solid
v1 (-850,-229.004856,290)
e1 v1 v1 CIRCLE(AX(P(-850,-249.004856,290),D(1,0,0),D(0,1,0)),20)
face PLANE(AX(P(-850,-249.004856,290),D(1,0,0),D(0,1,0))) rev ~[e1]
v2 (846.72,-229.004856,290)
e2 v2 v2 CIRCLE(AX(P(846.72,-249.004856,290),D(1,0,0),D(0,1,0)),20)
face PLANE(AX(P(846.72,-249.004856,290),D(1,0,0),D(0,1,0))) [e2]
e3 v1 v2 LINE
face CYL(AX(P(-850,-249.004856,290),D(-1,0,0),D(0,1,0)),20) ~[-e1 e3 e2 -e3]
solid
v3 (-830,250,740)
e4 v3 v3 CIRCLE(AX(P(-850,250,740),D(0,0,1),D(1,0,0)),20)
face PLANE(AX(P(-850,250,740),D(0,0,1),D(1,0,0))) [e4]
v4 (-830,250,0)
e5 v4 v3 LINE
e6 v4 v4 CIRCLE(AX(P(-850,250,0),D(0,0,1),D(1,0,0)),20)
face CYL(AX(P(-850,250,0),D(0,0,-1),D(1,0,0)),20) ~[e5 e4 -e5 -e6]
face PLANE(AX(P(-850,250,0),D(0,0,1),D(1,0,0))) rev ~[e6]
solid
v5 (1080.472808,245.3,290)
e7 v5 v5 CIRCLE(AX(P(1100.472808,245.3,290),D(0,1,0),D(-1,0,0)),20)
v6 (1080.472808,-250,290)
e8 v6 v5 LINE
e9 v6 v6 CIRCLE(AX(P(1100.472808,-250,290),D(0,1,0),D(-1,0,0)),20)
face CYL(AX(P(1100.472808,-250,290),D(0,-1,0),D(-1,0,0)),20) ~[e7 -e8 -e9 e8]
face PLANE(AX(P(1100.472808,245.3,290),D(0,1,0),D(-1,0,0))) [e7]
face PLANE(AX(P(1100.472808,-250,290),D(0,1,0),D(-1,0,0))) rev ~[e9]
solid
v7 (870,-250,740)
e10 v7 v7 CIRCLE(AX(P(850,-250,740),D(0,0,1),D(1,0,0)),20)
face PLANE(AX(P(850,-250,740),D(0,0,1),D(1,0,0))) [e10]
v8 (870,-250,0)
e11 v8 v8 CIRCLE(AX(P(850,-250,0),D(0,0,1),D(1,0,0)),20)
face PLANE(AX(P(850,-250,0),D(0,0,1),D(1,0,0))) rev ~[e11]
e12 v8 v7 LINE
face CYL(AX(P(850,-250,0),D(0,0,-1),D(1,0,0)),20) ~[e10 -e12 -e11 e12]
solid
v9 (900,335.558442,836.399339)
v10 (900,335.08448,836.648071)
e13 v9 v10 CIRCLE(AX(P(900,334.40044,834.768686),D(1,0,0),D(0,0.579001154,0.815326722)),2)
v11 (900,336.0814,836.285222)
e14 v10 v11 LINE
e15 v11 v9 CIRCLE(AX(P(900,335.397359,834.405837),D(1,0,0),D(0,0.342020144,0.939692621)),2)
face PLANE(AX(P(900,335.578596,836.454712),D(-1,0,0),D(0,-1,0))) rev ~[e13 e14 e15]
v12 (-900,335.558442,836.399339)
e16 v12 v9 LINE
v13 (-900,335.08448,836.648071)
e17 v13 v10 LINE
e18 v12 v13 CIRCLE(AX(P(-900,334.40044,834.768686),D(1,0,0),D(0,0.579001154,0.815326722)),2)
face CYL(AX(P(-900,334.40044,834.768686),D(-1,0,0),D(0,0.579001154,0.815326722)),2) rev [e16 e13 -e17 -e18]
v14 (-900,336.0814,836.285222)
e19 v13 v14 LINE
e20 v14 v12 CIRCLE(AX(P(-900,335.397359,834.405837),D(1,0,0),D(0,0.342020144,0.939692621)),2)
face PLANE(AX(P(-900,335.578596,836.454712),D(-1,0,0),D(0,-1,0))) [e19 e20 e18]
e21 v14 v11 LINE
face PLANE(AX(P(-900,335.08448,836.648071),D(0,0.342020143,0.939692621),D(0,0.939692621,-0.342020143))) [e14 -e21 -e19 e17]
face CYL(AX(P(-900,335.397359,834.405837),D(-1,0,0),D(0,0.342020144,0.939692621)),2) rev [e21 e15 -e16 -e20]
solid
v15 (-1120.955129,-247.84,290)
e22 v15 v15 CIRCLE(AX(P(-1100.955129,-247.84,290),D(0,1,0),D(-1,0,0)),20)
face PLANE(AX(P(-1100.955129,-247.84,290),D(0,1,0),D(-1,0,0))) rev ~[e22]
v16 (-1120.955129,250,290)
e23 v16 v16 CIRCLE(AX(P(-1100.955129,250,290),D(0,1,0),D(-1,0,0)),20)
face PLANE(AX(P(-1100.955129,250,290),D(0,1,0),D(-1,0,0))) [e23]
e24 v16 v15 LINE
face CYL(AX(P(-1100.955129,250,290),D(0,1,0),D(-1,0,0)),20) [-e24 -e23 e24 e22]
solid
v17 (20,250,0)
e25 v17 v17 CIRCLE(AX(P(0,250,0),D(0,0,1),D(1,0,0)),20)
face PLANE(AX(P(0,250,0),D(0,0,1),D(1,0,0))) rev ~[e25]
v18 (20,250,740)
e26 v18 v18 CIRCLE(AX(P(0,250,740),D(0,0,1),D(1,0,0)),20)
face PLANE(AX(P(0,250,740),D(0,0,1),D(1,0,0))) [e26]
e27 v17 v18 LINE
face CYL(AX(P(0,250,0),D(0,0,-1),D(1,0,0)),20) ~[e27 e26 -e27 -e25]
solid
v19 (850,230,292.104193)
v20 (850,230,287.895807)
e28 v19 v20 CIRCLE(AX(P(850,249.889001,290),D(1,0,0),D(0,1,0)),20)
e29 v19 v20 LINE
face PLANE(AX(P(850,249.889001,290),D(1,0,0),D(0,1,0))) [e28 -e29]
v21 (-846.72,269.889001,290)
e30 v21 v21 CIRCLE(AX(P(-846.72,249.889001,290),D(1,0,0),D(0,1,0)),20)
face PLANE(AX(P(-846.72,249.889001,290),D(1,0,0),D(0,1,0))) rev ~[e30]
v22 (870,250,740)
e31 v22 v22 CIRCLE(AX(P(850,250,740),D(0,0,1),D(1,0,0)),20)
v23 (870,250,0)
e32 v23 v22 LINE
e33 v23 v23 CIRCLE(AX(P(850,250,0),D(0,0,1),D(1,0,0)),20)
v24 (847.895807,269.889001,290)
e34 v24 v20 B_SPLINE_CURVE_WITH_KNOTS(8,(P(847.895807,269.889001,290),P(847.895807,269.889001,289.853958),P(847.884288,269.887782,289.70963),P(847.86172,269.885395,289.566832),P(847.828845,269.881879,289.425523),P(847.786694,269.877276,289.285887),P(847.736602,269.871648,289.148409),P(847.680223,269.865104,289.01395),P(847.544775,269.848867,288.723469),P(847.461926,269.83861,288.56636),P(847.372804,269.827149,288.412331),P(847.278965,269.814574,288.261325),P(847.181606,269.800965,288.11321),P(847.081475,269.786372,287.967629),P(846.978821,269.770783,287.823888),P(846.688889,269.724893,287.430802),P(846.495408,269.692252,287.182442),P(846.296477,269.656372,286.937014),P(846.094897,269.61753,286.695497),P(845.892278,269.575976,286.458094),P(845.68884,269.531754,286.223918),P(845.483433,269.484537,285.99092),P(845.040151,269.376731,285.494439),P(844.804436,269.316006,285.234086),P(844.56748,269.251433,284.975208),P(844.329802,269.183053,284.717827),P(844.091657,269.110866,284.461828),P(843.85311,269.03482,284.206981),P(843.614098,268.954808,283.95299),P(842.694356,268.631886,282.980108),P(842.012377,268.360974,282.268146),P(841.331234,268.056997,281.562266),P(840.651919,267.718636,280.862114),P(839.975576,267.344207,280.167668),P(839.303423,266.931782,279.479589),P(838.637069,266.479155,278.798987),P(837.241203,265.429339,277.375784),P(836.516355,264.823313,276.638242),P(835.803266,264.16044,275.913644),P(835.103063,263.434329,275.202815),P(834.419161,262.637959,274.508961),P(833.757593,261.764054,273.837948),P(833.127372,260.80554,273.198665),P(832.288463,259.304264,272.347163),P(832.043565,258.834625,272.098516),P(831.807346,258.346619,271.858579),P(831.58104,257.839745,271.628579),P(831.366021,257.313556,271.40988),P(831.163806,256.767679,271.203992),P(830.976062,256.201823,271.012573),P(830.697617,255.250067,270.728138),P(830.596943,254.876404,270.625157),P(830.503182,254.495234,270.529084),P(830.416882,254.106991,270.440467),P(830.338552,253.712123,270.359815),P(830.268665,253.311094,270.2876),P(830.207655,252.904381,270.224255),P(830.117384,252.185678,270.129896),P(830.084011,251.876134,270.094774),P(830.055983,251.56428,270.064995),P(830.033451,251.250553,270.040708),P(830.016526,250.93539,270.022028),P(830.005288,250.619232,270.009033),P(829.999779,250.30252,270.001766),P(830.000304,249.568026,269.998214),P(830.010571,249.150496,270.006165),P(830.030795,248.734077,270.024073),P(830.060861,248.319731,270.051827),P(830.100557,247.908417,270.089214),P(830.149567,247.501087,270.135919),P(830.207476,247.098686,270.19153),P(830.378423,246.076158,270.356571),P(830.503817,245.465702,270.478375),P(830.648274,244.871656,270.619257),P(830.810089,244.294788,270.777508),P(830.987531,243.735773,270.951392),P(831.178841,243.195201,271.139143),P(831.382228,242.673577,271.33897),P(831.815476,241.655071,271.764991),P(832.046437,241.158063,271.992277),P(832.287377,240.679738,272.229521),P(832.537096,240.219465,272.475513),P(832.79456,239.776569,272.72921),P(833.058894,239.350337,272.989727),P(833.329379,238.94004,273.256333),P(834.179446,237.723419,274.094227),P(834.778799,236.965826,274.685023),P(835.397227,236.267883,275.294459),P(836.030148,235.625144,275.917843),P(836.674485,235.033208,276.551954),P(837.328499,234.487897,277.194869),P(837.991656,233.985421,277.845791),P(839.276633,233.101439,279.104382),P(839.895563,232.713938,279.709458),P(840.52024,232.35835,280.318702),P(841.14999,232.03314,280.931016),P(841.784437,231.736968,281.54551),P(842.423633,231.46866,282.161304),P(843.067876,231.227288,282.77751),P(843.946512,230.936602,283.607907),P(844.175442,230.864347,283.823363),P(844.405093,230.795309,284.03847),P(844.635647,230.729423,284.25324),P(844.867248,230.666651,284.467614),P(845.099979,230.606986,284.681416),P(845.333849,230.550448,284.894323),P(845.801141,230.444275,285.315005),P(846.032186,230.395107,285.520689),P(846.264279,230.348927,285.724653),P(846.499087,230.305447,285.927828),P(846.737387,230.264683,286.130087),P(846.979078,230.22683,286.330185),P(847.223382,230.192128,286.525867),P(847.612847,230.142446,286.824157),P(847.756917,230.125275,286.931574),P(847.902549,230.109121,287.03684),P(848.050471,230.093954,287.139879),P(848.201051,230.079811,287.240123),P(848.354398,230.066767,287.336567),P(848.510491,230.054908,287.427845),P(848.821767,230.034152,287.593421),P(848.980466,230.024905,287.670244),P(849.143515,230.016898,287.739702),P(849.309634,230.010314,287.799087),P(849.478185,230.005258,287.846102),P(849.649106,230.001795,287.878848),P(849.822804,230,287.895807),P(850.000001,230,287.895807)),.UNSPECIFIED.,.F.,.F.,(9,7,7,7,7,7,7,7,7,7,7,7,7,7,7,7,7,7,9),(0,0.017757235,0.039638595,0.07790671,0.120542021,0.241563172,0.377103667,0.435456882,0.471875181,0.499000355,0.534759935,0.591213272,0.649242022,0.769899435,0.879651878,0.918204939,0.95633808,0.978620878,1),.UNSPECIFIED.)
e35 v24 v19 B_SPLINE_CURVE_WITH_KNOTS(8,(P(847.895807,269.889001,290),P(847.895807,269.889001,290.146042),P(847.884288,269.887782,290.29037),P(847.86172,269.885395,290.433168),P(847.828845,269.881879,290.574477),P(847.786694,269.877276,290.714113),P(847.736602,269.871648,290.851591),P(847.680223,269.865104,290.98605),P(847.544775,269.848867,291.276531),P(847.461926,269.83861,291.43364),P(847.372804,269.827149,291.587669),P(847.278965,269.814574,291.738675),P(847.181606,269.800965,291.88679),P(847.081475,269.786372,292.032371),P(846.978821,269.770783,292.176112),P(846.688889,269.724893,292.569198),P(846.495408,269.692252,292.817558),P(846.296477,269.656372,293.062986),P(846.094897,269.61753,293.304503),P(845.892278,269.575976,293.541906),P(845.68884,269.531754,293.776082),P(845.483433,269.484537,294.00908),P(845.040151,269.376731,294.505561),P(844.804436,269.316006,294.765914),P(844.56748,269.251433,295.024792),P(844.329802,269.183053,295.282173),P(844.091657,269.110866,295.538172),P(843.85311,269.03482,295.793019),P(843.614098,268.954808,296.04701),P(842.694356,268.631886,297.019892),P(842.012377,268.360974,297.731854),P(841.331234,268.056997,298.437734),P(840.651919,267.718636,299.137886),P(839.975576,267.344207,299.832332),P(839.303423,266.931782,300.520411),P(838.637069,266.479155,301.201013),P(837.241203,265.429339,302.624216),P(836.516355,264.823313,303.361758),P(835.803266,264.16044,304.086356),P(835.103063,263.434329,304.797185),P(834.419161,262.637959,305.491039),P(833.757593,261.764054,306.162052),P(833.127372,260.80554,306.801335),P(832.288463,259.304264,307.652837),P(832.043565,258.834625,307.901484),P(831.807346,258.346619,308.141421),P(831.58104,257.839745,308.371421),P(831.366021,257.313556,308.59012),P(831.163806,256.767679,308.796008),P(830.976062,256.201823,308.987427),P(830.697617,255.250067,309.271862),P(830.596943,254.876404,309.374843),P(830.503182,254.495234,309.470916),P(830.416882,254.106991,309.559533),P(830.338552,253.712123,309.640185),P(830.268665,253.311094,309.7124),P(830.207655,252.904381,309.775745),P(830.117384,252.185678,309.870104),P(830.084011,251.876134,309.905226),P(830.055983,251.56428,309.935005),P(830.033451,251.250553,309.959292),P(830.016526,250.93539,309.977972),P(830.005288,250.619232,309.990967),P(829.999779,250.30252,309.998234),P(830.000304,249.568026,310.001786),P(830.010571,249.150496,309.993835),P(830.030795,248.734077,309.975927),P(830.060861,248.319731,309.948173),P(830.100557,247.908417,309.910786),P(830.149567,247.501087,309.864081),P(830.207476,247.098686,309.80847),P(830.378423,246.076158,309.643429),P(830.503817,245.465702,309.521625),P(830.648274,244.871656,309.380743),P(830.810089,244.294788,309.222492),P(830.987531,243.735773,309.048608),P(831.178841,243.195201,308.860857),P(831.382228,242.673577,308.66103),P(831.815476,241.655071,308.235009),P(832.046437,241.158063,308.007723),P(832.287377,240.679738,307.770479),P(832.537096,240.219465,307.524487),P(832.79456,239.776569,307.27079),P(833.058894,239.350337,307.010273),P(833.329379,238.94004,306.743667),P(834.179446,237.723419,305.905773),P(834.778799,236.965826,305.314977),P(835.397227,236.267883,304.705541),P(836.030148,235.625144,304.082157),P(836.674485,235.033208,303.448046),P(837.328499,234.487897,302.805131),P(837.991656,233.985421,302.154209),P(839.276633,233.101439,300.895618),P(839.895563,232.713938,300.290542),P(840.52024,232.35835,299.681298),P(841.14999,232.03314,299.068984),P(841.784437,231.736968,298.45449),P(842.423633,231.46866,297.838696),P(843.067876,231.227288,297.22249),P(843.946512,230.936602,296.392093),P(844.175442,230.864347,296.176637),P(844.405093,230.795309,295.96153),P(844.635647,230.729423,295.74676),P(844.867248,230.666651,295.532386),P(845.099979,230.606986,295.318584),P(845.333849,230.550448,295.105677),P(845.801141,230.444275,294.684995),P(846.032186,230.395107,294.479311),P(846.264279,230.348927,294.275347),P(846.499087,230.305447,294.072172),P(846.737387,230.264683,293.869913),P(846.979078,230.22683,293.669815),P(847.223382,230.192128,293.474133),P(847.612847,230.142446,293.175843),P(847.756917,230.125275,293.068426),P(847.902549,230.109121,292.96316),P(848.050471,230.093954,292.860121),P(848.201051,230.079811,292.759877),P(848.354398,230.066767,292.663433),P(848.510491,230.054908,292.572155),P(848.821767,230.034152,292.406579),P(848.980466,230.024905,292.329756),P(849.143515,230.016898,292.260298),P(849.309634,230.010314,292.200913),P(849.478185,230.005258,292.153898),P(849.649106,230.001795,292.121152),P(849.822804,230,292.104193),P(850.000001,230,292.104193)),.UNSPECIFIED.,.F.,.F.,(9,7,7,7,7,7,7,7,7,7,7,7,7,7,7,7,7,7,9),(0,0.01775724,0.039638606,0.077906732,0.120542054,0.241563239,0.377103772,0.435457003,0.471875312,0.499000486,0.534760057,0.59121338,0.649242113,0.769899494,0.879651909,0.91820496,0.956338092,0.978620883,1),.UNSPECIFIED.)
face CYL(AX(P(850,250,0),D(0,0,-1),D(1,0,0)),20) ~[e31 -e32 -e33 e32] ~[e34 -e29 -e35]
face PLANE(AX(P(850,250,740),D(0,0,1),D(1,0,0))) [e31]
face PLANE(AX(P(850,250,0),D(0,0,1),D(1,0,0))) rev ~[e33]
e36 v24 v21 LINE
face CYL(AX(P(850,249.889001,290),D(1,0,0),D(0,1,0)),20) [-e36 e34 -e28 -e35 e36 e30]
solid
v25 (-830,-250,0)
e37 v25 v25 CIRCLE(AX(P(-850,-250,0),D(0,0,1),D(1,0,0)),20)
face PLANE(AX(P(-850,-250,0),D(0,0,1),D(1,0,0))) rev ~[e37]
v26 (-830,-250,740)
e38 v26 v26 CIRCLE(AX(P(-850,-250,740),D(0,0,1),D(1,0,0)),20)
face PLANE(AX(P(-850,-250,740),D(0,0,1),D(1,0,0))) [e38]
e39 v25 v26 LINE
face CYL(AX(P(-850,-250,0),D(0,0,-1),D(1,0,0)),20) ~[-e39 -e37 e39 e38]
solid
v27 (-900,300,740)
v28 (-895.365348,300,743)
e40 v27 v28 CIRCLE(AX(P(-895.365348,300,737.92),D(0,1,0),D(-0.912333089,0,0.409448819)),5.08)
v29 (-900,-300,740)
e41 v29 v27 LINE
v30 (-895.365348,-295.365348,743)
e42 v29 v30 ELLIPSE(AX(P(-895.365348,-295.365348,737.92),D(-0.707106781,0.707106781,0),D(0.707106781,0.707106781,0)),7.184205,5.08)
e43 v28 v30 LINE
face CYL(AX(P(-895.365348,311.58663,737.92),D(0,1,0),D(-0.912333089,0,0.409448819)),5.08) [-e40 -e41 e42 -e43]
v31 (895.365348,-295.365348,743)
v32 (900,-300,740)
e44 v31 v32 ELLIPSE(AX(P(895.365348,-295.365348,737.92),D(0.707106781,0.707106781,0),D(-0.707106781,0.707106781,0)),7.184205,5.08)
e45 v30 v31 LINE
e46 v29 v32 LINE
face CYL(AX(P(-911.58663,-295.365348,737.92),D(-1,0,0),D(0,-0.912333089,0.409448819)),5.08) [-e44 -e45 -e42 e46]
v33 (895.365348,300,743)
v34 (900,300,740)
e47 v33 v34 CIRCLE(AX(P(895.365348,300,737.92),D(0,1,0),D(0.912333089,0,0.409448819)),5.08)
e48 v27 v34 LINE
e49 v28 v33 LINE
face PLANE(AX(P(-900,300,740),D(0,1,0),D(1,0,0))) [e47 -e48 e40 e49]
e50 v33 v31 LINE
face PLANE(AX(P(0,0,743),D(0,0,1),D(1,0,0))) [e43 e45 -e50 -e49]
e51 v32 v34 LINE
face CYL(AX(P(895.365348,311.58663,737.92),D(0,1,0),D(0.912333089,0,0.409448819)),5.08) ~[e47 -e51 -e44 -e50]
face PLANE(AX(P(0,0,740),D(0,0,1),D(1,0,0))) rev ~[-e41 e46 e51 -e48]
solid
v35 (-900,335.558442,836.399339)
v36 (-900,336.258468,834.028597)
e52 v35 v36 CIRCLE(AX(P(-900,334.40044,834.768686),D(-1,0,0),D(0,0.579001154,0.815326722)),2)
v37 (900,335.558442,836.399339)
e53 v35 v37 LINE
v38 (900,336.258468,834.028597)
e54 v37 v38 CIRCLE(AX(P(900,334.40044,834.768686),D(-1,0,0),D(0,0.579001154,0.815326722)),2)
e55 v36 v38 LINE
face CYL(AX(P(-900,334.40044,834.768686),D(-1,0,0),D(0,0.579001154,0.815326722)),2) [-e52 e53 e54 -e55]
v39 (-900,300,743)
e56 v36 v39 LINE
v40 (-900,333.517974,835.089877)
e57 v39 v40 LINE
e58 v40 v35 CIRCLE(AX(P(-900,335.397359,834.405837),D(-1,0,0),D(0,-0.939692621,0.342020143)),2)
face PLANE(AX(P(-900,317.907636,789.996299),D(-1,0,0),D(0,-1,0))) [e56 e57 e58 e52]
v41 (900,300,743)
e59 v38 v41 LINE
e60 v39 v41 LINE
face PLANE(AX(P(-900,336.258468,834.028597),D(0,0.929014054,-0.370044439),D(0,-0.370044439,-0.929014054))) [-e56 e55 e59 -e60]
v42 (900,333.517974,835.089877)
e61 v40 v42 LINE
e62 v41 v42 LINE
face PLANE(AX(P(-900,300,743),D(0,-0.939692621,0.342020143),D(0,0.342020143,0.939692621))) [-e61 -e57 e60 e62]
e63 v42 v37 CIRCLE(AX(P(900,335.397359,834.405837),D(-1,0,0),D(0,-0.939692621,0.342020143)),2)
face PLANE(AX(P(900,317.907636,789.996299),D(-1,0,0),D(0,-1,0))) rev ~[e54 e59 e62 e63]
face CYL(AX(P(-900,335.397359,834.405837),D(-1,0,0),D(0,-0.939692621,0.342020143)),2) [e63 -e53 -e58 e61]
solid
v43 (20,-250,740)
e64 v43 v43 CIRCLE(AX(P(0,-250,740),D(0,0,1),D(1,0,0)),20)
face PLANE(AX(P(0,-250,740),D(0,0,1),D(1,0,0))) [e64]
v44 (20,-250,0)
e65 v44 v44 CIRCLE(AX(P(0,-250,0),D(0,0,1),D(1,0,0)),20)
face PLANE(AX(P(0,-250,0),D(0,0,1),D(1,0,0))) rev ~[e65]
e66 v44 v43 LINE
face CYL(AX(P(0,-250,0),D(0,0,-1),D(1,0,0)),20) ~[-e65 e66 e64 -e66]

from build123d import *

# Parameters (mm, degrees)
F0_R        = 20
F1_DEPTH    = 740
F2_W        = 1800
F2_H        = 600
F3_DEPTH    = 3
F5_DEPTH    = 1800
F6_T1_DEPTH = 623.1732604525
F6_T3_DEPTH = 1823.1732604525
F8_R        = 20
F9_DEPTH    = 1696.72
F11_R       = 20
F12_DEPTH   = 495.3
F14_R       = 20
F15_DEPTH   = 1696.72
F17_R       = 20
F18_DEPTH   = 497.84


# Not quite as in the source:
# - a fillet or chamfer that OpenCascade refuses, or shapes differently, is made with other operations: its cross-section is extruded or revolved along the edge and cut away or added


with BuildPart() as f1:
    # F0 (on Top) → F1 (new body)
    with BuildSketch(Plane.XY):
        with Locations((-850, 250)):
            Circle(F0_R)
    extrude(amount=F1_DEPTH)


with BuildPart() as f1b:
    # F0 (on Top) → F1, piece 2 (new body)
    with BuildSketch(Plane.XY):
        with Locations((-850, -250)):
            Circle(F0_R)
    extrude(amount=F1_DEPTH)


with BuildPart() as f1c:
    # F0 (on Top) → F1, piece 3 (new body)
    with BuildSketch(Plane.XY):
        with Locations((850, 250)):
            Circle(F0_R)
    extrude(amount=F1_DEPTH)

    # F14 (on face) → F15 (join)
    with BuildSketch(Plane.YZ.offset(850)):
        with Locations((249.8890012503, 290)):
            Circle(F14_R)
    extrude(amount=-F15_DEPTH)


with BuildPart() as f1d:
    # F0 (on Top) → F1, piece 4 (new body)
    with BuildSketch(Plane.XY):
        with Locations((850, -250)):
            Circle(F0_R)
    extrude(amount=F1_DEPTH)


with BuildPart() as f1e:
    # F0 (on Top) → F1, piece 5 (new body)
    with BuildSketch(Plane.XY):
        with Locations((0, 250)):
            Circle(F0_R)
    extrude(amount=F1_DEPTH)


with BuildPart() as f1f:
    # F0 (on Top) → F1, piece 6 (new body)
    with BuildSketch(Plane.XY):
        with Locations((0, -250)):
            Circle(F0_R)
    extrude(amount=F1_DEPTH)


with BuildPart() as f3:
    # F2 (on face) → F3 (new body)
    with BuildSketch(Plane.XY.offset(740)):
        Rectangle(F2_W, F2_H)
    extrude(amount=F3_DEPTH)

    # F6: fillet of radius 5.08 on 3 edges, made by hand

    # F6_s2 → F6_t1 (cut)
    with BuildSketch(Plane.XZ.offset(-311.5866302263)):
        with BuildLine():
            ThreePointArc((900, 740), (898.1257826579, 742.1845515591), (895.3653479095, 743))
            Line((895.3653479095, 743), (900, 743))
            Line((900, 743), (900, 740))
        make_face()
        with BuildLine():
            ThreePointArc((-900, 740), (-898.1257826579, 742.1845515591), (-895.3653479095, 743))
            Line((-895.3653479095, 743), (-900, 743))
            Line((-900, 743), (-900, 740))
        make_face()
    extrude(amount=F6_T1_DEPTH, mode=Mode.SUBTRACT)

    # F6_s4 → F6_t3 (cut)
    with BuildSketch(Plane.YZ.offset(-911.5866302263)):
        with BuildLine():
            ThreePointArc((-300, 740), (-298.1257826579, 742.1845515591), (-295.3653479095, 743))
            Line((-295.3653479095, 743), (-300, 743))
            Line((-300, 743), (-300, 740))
        make_face()
    extrude(amount=F6_T3_DEPTH, mode=Mode.SUBTRACT)


with BuildPart() as f5:
    # F4 (on face) → F5 (new body, through all)
    with BuildSketch(Plane(origin=(-900, 0, 0), x_dir=(0, -1, 0), z_dir=(-1, 0, 0))):
        with BuildLine():
            Line((-336.2584676847, 834.0285967724), (-300, 743))
            Line((-300, 743), (-333.5179740459, 835.089876837))
            ThreePointArc((-333.5179740459, 835.089876837), (-334.3171677089, 836.089043654), (-335.5584418841, 836.3993390954))
            ThreePointArc((-335.5584418841, 836.3993390954), (-336.3185674809, 835.3350648013), (-336.2584676847, 834.0285967724))
        make_face()
    extrude(amount=-F5_DEPTH)


with BuildPart() as f5b:
    # F4 (on face) → F5, piece 2 (new body, through all)
    with BuildSketch(Plane(origin=(-900, 0, 0), x_dir=(0, -1, 0), z_dir=(-1, 0, 0))):
        with BuildLine():
            ThreePointArc((-336.0813995741, 836.2852217919), (-335.8237556544, 836.3598544977), (-335.5584418841, 836.3993390954))
            ThreePointArc((-335.5584418841, 836.3993390954), (-335.3298195345, 836.5396325429), (-335.0844798629, 836.6480708928))
            Line((-335.0844798629, 836.6480708928), (-336.0813995741, 836.2852217919))
        make_face()
    extrude(amount=-F5_DEPTH)


with BuildPart() as f9:
    # F8 (on face) → F9 (new body)
    with BuildSketch(Plane.YZ.offset(-850)):
        with Locations((-249.004855752, 290)):
            Circle(F8_R)
    extrude(amount=F9_DEPTH)


with BuildPart() as f12:
    # F11 (on face) → F12 (new body)
    with BuildSketch(Plane(origin=(0, -250, 0), x_dir=(-1, 0, 0), z_dir=(0, 1, 0))):
        with Locations((-1100.4728078842, 290)):
            Circle(F11_R)
    extrude(amount=F12_DEPTH)


with BuildPart() as f18:
    # F17 (on face) → F18 (new body)
    with BuildSketch(Plane(origin=(0, 250, 0), x_dir=(-1, 0, 0), z_dir=(0, 1, 0))):
        with Locations((1100.9551286697, 290)):
            Circle(F17_R)
    extrude(amount=-F18_DEPTH)


solid = Compound([f1.part, f1b.part, f1c.part, f1d.part, f1e.part, f1f.part, f3.part, f5.part, f5b.part, f9.part, f12.part, f18.part])
